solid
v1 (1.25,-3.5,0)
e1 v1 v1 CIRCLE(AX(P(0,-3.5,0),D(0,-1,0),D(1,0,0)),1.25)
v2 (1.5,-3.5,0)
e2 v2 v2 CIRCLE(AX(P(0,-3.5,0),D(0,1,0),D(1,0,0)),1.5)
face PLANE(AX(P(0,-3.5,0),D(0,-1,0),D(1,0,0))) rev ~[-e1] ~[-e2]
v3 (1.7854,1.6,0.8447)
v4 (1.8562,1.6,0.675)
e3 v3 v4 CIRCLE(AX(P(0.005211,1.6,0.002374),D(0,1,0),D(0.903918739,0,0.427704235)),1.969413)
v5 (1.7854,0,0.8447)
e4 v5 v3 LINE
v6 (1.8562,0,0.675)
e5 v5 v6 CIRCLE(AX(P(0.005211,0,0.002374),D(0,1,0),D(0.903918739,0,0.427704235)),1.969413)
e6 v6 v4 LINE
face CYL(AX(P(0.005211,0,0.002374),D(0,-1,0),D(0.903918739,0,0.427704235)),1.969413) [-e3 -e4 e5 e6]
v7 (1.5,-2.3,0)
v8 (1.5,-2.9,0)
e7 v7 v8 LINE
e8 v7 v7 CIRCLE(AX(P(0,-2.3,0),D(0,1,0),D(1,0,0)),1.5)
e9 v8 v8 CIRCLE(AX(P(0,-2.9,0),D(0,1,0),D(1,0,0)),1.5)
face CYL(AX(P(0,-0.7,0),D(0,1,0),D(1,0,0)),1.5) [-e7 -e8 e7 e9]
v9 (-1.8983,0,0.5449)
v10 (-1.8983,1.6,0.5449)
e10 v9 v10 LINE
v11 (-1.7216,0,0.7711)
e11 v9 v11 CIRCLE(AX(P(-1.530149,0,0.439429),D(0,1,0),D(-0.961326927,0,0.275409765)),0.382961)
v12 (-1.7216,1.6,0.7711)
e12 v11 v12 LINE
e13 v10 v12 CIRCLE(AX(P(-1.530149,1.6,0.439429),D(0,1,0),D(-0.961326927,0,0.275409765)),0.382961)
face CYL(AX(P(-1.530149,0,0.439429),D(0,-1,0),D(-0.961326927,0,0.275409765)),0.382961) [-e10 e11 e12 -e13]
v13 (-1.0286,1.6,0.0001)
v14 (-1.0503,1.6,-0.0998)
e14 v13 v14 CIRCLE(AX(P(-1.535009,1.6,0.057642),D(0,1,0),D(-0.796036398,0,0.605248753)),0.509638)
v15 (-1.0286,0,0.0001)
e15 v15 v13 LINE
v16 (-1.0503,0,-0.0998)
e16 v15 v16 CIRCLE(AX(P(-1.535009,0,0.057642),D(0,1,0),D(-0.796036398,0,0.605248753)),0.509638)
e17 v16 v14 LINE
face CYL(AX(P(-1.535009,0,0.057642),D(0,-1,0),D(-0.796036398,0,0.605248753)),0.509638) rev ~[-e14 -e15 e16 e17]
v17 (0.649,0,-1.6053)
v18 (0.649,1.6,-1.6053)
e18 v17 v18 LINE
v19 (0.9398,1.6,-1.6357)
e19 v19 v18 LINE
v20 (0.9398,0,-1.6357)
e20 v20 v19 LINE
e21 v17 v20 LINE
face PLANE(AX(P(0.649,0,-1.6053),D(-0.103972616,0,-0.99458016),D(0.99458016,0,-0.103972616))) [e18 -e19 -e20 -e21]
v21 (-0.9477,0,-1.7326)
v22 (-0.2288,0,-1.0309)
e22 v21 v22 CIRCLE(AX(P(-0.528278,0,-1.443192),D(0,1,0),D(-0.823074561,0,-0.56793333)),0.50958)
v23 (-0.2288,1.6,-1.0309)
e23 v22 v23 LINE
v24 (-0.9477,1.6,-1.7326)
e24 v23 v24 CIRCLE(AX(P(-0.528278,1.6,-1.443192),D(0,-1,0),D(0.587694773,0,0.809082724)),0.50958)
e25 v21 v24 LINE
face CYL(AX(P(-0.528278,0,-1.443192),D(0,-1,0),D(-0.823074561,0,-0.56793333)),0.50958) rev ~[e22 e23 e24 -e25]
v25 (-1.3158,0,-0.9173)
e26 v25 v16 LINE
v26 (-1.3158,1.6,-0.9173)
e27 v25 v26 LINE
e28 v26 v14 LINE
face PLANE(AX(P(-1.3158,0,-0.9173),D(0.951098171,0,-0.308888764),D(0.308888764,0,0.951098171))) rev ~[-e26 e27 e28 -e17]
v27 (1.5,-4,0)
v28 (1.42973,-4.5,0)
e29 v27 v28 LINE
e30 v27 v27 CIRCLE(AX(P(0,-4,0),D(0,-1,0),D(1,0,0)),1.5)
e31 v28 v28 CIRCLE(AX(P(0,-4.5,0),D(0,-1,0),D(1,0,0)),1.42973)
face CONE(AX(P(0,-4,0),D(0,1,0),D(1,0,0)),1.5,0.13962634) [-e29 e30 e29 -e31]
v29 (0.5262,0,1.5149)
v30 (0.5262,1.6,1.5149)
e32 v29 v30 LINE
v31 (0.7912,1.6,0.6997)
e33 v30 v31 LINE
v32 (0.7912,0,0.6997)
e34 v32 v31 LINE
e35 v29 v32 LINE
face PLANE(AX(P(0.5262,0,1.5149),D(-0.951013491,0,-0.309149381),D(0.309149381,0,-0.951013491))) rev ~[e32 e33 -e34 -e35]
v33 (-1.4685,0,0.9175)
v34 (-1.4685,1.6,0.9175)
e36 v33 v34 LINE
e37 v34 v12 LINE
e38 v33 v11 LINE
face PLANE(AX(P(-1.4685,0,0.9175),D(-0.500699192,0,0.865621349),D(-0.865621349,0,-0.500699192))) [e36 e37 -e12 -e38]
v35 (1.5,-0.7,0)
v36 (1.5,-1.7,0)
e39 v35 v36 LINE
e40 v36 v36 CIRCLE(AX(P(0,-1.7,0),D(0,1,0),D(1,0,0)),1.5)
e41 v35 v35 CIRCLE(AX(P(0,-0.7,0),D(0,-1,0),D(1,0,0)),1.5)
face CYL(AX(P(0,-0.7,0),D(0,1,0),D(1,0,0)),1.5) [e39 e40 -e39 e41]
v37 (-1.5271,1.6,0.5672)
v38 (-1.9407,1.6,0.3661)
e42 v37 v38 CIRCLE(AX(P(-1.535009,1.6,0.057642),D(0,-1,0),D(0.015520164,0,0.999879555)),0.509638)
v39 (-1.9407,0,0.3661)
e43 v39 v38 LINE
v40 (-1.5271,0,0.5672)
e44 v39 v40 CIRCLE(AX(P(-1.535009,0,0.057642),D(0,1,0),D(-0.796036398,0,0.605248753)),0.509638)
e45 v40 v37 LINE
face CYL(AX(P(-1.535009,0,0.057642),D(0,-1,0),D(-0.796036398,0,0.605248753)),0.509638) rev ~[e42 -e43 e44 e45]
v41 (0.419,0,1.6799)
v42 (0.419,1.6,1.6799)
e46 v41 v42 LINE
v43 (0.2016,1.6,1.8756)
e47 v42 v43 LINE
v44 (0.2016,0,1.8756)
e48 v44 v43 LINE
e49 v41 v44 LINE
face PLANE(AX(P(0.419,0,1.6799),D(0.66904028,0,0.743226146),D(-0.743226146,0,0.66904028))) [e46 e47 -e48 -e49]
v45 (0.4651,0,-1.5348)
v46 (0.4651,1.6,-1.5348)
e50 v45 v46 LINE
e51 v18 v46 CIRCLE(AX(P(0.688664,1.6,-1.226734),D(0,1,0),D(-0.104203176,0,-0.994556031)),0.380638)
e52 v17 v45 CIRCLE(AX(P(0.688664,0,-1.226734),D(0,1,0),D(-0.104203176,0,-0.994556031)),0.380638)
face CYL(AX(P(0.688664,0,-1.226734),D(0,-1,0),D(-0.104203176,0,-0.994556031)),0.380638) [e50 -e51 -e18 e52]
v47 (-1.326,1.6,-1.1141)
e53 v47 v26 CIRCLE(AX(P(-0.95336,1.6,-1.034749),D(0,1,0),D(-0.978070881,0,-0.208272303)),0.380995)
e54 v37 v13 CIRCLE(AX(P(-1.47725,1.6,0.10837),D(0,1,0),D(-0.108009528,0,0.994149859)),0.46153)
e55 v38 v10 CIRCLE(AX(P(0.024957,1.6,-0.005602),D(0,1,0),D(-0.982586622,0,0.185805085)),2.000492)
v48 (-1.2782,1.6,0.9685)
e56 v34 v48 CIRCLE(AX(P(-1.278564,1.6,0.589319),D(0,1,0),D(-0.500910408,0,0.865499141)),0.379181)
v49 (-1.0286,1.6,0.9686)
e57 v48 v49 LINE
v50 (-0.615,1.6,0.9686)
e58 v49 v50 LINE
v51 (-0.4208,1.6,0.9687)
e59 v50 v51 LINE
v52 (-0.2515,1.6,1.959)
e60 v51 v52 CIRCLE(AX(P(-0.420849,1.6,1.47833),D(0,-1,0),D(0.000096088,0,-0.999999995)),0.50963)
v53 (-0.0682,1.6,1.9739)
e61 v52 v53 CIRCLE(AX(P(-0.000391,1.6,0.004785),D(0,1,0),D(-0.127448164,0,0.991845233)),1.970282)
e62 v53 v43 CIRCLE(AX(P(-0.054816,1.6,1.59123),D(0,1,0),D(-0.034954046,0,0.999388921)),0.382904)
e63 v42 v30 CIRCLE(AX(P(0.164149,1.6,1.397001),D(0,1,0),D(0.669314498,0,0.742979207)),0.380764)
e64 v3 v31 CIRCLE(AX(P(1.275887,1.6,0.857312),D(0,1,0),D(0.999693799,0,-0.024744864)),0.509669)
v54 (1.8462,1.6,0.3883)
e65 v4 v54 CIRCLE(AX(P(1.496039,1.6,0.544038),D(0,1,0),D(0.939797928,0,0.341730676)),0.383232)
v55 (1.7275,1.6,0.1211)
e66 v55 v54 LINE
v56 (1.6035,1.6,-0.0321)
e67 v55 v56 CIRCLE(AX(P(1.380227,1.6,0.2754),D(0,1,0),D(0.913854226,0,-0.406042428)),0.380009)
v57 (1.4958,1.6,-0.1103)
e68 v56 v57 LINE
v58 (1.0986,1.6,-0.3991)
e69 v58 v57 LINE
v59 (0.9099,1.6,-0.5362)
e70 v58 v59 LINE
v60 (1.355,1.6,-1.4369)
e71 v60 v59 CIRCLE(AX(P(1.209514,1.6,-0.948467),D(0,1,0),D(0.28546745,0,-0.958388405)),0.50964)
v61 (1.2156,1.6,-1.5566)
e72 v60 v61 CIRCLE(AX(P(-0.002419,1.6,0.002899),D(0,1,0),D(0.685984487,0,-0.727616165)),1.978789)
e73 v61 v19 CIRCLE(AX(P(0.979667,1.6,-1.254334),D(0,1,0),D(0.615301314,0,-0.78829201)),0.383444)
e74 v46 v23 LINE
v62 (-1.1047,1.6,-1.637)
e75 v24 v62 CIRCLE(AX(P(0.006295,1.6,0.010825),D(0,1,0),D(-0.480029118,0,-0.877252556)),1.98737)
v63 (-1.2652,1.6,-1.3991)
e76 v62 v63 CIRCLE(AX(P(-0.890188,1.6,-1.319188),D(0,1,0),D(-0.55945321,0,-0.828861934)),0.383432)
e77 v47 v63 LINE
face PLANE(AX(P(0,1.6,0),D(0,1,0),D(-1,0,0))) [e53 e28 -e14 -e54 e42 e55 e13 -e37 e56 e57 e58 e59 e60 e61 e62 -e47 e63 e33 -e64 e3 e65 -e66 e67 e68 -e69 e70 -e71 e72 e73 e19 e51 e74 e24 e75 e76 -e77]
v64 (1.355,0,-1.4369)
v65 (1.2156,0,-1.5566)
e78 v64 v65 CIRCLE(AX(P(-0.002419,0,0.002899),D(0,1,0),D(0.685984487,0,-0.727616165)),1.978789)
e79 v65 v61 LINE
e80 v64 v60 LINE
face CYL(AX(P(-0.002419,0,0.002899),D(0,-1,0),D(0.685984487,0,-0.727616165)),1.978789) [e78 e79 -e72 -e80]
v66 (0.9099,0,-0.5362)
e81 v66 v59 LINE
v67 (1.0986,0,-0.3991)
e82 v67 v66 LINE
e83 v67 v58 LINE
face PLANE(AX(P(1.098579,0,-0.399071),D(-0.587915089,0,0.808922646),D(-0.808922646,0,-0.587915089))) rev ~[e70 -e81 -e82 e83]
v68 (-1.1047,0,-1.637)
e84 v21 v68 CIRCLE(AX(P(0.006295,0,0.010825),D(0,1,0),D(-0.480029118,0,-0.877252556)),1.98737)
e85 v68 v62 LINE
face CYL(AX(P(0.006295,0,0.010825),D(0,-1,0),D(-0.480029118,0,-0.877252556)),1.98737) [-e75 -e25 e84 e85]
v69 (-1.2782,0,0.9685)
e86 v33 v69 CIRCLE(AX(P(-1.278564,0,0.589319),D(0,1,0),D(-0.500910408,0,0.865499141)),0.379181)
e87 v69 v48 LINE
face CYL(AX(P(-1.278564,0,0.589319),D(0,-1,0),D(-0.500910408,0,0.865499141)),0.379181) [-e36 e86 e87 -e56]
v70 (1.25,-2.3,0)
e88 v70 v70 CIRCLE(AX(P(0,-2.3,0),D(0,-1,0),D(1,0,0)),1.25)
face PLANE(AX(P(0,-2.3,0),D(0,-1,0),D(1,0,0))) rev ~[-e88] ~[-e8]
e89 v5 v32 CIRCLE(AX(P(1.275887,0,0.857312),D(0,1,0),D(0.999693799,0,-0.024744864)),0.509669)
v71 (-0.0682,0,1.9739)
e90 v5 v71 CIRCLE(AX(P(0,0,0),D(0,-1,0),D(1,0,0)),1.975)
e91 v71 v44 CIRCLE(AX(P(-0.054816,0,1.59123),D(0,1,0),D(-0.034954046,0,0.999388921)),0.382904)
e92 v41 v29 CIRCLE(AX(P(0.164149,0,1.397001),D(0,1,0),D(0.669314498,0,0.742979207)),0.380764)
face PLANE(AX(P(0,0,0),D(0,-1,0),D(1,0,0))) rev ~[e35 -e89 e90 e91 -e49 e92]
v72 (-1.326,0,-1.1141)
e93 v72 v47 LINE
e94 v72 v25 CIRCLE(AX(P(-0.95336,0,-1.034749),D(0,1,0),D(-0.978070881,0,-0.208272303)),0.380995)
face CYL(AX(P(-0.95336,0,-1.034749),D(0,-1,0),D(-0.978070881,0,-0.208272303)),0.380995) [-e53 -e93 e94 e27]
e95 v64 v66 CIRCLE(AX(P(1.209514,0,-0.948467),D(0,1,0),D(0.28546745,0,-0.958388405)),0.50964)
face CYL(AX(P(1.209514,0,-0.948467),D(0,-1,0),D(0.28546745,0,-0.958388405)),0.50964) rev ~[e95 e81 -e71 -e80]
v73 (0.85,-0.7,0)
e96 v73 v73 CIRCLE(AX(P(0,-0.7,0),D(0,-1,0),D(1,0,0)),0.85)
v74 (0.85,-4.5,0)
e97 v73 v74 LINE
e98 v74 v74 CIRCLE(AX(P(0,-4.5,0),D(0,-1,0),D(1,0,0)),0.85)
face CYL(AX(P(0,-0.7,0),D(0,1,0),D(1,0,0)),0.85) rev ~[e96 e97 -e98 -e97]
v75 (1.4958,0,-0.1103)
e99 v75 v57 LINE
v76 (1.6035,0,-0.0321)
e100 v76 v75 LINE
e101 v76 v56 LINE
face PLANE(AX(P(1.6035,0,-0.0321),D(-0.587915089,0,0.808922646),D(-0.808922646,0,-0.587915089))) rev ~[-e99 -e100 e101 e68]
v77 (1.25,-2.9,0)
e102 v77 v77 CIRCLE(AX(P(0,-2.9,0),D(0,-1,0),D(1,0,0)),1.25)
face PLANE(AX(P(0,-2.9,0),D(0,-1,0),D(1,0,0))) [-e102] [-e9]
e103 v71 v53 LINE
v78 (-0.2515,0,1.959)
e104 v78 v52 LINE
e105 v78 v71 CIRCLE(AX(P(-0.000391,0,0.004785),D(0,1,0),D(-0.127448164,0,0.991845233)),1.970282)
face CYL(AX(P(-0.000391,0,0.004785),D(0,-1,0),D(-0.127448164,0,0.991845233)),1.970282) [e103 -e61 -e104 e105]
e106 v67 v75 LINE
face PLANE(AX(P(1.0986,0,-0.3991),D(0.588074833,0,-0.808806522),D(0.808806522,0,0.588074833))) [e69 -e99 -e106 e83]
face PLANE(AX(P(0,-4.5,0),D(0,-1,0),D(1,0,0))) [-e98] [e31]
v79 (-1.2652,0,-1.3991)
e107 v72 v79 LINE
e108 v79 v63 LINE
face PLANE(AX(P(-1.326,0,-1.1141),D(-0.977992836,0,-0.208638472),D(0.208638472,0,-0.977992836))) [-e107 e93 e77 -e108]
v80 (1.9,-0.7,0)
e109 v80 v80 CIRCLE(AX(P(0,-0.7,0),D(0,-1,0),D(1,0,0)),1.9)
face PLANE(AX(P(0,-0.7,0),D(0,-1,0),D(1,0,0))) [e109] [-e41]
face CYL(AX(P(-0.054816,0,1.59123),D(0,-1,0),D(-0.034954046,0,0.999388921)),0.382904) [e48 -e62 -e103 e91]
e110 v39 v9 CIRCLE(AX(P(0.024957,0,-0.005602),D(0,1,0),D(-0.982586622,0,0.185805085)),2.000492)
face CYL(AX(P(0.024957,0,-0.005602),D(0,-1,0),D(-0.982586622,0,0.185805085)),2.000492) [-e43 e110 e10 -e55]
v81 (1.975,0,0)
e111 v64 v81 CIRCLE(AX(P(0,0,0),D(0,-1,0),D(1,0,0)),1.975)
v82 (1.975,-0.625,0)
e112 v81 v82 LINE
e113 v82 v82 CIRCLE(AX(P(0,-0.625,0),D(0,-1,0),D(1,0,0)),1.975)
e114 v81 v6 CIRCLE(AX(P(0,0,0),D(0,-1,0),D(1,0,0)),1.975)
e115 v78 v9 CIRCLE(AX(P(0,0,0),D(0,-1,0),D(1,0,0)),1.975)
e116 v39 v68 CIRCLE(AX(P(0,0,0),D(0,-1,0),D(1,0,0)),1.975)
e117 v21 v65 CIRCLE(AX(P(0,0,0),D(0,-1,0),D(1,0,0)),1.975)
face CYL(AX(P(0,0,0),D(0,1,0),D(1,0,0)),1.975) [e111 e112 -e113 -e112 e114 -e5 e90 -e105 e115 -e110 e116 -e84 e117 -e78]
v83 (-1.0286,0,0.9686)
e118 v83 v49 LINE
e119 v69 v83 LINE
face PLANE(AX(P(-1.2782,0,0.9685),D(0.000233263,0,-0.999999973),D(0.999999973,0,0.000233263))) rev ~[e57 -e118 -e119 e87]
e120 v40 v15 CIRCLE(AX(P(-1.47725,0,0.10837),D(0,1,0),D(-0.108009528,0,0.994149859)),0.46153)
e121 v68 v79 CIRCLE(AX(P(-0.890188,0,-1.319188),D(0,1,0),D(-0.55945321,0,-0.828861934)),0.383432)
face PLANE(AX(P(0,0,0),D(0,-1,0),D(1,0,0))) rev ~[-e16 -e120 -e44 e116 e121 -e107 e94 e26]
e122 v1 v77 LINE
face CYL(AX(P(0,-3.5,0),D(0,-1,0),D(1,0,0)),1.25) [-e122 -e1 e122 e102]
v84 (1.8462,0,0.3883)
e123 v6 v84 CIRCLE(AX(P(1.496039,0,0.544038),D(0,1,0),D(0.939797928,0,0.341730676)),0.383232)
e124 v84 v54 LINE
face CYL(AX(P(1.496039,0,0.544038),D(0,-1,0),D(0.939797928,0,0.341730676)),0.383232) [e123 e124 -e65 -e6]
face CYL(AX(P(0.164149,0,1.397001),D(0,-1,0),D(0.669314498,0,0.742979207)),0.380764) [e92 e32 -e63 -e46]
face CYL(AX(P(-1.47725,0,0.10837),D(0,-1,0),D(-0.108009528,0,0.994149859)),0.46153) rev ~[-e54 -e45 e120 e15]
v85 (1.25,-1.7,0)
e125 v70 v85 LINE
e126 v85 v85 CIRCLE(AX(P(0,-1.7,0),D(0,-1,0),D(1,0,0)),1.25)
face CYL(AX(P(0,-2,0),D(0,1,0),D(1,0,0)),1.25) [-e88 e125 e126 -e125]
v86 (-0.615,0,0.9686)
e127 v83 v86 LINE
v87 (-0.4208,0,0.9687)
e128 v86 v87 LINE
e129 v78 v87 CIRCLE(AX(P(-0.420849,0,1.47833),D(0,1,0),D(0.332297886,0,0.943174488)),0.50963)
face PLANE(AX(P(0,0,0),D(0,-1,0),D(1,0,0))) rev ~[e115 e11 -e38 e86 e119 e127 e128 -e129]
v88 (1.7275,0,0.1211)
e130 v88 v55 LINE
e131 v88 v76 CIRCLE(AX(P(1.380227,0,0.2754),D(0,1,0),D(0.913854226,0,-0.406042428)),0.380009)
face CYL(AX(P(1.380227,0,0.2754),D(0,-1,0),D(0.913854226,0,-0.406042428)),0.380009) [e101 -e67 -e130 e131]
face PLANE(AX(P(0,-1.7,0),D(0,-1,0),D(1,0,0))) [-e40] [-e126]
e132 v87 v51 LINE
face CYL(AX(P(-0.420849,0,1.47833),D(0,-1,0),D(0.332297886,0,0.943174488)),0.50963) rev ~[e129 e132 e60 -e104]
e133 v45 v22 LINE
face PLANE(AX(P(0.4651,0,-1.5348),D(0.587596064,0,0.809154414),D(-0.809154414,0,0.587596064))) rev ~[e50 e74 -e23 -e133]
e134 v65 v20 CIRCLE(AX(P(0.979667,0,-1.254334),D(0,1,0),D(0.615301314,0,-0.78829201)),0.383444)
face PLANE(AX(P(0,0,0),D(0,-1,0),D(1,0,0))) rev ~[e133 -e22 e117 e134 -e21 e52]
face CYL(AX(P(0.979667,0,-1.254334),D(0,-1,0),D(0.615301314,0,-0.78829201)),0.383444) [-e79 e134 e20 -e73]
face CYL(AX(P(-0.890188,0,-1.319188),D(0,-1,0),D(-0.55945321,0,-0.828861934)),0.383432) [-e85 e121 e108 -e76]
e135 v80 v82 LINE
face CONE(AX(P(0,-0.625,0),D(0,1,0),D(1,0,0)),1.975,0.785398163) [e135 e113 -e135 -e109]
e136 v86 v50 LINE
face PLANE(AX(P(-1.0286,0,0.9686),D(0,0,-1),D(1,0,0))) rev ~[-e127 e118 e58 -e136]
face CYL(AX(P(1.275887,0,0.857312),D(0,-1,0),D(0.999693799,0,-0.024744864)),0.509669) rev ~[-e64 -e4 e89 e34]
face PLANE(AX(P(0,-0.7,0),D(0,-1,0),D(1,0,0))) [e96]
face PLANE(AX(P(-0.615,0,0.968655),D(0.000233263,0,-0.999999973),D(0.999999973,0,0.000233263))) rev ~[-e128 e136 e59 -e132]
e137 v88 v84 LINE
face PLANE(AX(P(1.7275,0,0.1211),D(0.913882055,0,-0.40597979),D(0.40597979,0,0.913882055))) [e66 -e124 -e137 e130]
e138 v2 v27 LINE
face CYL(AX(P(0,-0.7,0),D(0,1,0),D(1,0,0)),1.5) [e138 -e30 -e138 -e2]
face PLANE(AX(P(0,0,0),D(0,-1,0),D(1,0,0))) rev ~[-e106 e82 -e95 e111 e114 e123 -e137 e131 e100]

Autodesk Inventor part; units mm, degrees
ref_plane "YZ Plane" through (0, 0, 0) normal (1, 0, 0) x (0, 1, 0)
sketch "Sketch1" plane through (0, 0, 0) normal (0, 1, 0) x (-1, 0, 0)
  line L0 (-0.649, -1.6053) -> (-0.9398, -1.6357)
  line L1 (-0.419, 1.6799) -> (-0.2016, 1.8756)
  line L2 (-0.419, 1.6799) -> (-0.2016, 1.8756)
  arc A0 (0.9477, -1.7326) -> (0.2288, -1.0309) centre (0.5282, -1.4432) ccw
  line L3 (-0.4651, -1.5348) -> (0.2288, -1.0309)
  arc A1 (-1.355, -1.4369) -> (-1.2156, -1.5566) centre (-0.0001, 0.0001) ccw
  line L4 (-0.4651, -1.5348) -> (0.2288, -1.0309)
  arc A2 (-0.649, -1.6053) -> (-0.4651, -1.5348) centre (-0.6886, -1.227) ccw
  arc A3 (0.2515, 1.959) -> (0.4208, 0.9687) centre (0.4209, 1.4783) ccw
  line L5 (1.2782, 0.9685) -> (0.4208, 0.9687)
  arc A4 (1.4685, 0.9175) -> (1.2782, 0.9685) centre (1.2781, 0.5882) ccw
  line L6 (1.4685, 0.9175) -> (1.7216, 0.7711)
  arc A5 (1.9407, 0.3661) -> (1.0503, -0.0998) centre (1.535, 0.0576) ccw
  line L7 (1.3158, -0.9173) -> (1.0503, -0.0998)
  arc A6 (1.326, -1.1141) -> (1.3158, -0.9173) centre (0.954, -1.0348) ccw
  line L8 (1.326, -1.1141) -> (1.2652, -1.3991)
  arc A7 (-1.7854, 0.8447) -> (-0.7912, 0.6997) centre (-1.2759, 0.8573) ccw
  line L9 (-0.5262, 1.5149) -> (-0.7912, 0.6997)
  arc A8 (-0.419, 1.6799) -> (-0.5262, 1.5149) centre (-0.1645, 1.3973) ccw
  line L10 (-1.7275, 0.1211) -> (-1.8462, 0.3883)
  arc A9 (-1.7275, 0.1211) -> (-1.6035, -0.0321) centre (-1.3799, 0.2756) ccw
  line L11 (-1.6035, -0.0321) -> (-0.9099, -0.5362)
  arc A10 (-1.355, -1.4369) -> (-0.9099, -0.5362) centre (-1.2095, -0.9485) ccw
  arc A11 (1.9407, 0.366) -> (1.8983, 0.5449) centre (-0.0001, 0.0001) ccw
  arc A12 (-1.7854, 0.8447) -> (-1.8562, 0.675) centre (-0.0001, 0.0001) ccw
  arc A13 (0.9477, -1.7326) -> (1.1047, -1.637) centre (-0.0001, 0.0001) ccw
  arc A14 (0.2515, 1.959) -> (0.0682, 1.9739) centre (-0.0001, 0.0001) ccw
  arc A15 (0.0682, 1.9739) -> (-0.2016, 1.8756) centre (0.0549, 1.5907) ccw
  arc A16 (-1.8562, 0.675) -> (-1.8462, 0.3883) centre (-1.4958, 0.544) ccw
  arc A17 (1.8983, 0.5449) -> (1.7216, 0.7711) centre (1.5297, 0.4392) ccw
  arc A18 (-1.2156, -1.5566) -> (-0.9398, -1.6357) centre (-0.9797, -1.2544) ccw
  arc A19 (1.1047, -1.637) -> (1.2652, -1.3991) centre (0.8902, -1.3192) ccw
  circle A20 centre (-0.0001, 0.0001) radius 1.975
  arc A21 (1.5271, 0.5672) -> (1.0286, 0.0001) centre (1.4772, 0.1085) ccw
  line L12 (1.7216, 0.7711) -> (1.4685, 0.9175)
  line L13 (1.0286, 0.9686) -> (0.615, 0.9686)
  arc A22 (-1.5257, 0.4131) -> (-0.7912, 0.6997) centre (-1.2759, 0.8573) ccw
  arc A23 (-0.0001, 1.1912) -> (0.4206, 0.9684) centre (0.3627, 1.3676) ccw
  line L14 (-0.419, 1.6799) -> (-0.2016, 1.8756)
  arc A24 (-0.7912, 0.6997) -> (-0.7912, 0.6997) centre (-1.0986, 0.7997) ccw
  line L15 (1.326, -1.1141) -> (1.2652, -1.3991)
  arc A25 (0.7729, -0.9962) -> (0.2288, -1.0309) centre (0.5282, -1.4432) ccw
  arc A26 (-0.9715, -1.3991) -> (-0.9099, -0.5362) centre (-1.2095, -0.9485) ccw
  line L16 (-1.0986, -0.3991) -> (-1.4958, -0.1103)
  line L17 (-0.649, -1.6053) -> (-0.9099, -1.6326)
  arc A27 (-1.7278, 0.1218) -> (-1.8462, 0.3883) centre (-12657.1556, -5624.5961) ccw
  arc A28 (1.9228, 0.3883) -> (1.5271, 0.5672) centre (1.535, 0.0576) ccw
  arc A29 (0.9477, -1.7326) -> (0.7509, -0.9848) centre (0.5282, -1.4432) ccw
  arc A30 (-1.3317, -1.4432) -> (-0.9715, -1.3991) centre (-1.2095, -0.9485) ccw
  arc A31 (0.2515, 1.959) -> (-0.0001, 1.1912) centre (0.603, 1.4187) ccw
  arc A32 (-1.7854, 0.8447) -> (-1.5257, 0.4131) centre (-1.2759, 0.8573) ccw
  point P0 (0, 0)
  point P1 (1.2784, 0.9684)
  point P2 (1.1047, -1.637)
  point P3 (1.9407, 0.3661)
  point P4 (1.8983, 0.5449)
  point P5 (0.0682, 1.9739)
  point P6 (-1.7854, 0.8447)
  point P7 (-1.8562, 0.675)
  point P8 (-1.355, -1.4369)
  point P9 (-1.2156, -1.5566)
  dimension "d0" = 3.95
extrude "Extrusion1" add sketch "Sketch1" along normal blind 1.6 contours L0 A18 A1 A10 L11 A9 L10 A16 A12 A7 L9 A8 L1 A15 A14 A3 A23 L5 A4 L6 A17 A11 A5 A21 L7 A6 L8 A19 A13 A0 L3 A2 | A3 A23
sketch "Sketch2" plane through (0, 0, 0) normal (0, -1, 0) x (1, 0, 0)
  circle A0 centre (0, 0) radius 1.975
  dimension "d3" = 3.95
extrude "Extrusion2" add sketch "Sketch2" along normal blind 0.7
sketch "Sketch3" plane through (0, -0.7, 0) normal (0, -1, 0) x (1, 0, 0)
  circle A0 centre (0, 0) radius 1.5
  circle A1 centre (0, 0) radius 0.85
  dimension "d6" = 3
  dimension "d7" = 1.7
extrude "Extrusion3" add sketch "Sketch3" along normal blind 3.8
chamfer "Chamfer1" distance 0.5 angle 8 1 edges at (-1.5, -4.5, 0) measured on face at (1.4951, -3.2333, -0.1207)
ref_plane "Work Plane1" through (0, -3.5, 0) normal (0, -1, 0) x (1, 0, 0)
sketch "Sketch6" plane through (0, -3.5, 0) normal (0, -1, 0) x (1, 0, 0)
  circle A0 centre (0, 0) radius 1.25
  circle A1 centre (0, 0) radius 1.8158
  circle A2 centre (0, 0) radius 1.5 projected
  dimension "d22" = 0.25
extrude "Extrusion5" cut sketch "Sketch6" against normal blind 0.6 contours A1 | A2
ref_plane "Work Plane2" through (0, -2, 0) normal (0, -1, 0) x (1, 0, 0)
sketch "Sketch12" plane through (0, -2, 0) normal (0, -1, 0) x (1, 0, 0)
  circle A0 centre (0, 0) radius 1.25
  circle A1 centre (0, 0) radius 1.5 projected
  circle A2 centre (0, 0) radius 1.6718
  dimension "d32" = 0.25
extrude "Extrusion8" cut sketch "Sketch12" against normal mid plane 0.6 contours A1 | A2
chamfer "Chanfrein3" distance 0.075 angle 45 1 edges at (-1.975, -0.7, 0)
properties part number "4mm_uncorrected"
